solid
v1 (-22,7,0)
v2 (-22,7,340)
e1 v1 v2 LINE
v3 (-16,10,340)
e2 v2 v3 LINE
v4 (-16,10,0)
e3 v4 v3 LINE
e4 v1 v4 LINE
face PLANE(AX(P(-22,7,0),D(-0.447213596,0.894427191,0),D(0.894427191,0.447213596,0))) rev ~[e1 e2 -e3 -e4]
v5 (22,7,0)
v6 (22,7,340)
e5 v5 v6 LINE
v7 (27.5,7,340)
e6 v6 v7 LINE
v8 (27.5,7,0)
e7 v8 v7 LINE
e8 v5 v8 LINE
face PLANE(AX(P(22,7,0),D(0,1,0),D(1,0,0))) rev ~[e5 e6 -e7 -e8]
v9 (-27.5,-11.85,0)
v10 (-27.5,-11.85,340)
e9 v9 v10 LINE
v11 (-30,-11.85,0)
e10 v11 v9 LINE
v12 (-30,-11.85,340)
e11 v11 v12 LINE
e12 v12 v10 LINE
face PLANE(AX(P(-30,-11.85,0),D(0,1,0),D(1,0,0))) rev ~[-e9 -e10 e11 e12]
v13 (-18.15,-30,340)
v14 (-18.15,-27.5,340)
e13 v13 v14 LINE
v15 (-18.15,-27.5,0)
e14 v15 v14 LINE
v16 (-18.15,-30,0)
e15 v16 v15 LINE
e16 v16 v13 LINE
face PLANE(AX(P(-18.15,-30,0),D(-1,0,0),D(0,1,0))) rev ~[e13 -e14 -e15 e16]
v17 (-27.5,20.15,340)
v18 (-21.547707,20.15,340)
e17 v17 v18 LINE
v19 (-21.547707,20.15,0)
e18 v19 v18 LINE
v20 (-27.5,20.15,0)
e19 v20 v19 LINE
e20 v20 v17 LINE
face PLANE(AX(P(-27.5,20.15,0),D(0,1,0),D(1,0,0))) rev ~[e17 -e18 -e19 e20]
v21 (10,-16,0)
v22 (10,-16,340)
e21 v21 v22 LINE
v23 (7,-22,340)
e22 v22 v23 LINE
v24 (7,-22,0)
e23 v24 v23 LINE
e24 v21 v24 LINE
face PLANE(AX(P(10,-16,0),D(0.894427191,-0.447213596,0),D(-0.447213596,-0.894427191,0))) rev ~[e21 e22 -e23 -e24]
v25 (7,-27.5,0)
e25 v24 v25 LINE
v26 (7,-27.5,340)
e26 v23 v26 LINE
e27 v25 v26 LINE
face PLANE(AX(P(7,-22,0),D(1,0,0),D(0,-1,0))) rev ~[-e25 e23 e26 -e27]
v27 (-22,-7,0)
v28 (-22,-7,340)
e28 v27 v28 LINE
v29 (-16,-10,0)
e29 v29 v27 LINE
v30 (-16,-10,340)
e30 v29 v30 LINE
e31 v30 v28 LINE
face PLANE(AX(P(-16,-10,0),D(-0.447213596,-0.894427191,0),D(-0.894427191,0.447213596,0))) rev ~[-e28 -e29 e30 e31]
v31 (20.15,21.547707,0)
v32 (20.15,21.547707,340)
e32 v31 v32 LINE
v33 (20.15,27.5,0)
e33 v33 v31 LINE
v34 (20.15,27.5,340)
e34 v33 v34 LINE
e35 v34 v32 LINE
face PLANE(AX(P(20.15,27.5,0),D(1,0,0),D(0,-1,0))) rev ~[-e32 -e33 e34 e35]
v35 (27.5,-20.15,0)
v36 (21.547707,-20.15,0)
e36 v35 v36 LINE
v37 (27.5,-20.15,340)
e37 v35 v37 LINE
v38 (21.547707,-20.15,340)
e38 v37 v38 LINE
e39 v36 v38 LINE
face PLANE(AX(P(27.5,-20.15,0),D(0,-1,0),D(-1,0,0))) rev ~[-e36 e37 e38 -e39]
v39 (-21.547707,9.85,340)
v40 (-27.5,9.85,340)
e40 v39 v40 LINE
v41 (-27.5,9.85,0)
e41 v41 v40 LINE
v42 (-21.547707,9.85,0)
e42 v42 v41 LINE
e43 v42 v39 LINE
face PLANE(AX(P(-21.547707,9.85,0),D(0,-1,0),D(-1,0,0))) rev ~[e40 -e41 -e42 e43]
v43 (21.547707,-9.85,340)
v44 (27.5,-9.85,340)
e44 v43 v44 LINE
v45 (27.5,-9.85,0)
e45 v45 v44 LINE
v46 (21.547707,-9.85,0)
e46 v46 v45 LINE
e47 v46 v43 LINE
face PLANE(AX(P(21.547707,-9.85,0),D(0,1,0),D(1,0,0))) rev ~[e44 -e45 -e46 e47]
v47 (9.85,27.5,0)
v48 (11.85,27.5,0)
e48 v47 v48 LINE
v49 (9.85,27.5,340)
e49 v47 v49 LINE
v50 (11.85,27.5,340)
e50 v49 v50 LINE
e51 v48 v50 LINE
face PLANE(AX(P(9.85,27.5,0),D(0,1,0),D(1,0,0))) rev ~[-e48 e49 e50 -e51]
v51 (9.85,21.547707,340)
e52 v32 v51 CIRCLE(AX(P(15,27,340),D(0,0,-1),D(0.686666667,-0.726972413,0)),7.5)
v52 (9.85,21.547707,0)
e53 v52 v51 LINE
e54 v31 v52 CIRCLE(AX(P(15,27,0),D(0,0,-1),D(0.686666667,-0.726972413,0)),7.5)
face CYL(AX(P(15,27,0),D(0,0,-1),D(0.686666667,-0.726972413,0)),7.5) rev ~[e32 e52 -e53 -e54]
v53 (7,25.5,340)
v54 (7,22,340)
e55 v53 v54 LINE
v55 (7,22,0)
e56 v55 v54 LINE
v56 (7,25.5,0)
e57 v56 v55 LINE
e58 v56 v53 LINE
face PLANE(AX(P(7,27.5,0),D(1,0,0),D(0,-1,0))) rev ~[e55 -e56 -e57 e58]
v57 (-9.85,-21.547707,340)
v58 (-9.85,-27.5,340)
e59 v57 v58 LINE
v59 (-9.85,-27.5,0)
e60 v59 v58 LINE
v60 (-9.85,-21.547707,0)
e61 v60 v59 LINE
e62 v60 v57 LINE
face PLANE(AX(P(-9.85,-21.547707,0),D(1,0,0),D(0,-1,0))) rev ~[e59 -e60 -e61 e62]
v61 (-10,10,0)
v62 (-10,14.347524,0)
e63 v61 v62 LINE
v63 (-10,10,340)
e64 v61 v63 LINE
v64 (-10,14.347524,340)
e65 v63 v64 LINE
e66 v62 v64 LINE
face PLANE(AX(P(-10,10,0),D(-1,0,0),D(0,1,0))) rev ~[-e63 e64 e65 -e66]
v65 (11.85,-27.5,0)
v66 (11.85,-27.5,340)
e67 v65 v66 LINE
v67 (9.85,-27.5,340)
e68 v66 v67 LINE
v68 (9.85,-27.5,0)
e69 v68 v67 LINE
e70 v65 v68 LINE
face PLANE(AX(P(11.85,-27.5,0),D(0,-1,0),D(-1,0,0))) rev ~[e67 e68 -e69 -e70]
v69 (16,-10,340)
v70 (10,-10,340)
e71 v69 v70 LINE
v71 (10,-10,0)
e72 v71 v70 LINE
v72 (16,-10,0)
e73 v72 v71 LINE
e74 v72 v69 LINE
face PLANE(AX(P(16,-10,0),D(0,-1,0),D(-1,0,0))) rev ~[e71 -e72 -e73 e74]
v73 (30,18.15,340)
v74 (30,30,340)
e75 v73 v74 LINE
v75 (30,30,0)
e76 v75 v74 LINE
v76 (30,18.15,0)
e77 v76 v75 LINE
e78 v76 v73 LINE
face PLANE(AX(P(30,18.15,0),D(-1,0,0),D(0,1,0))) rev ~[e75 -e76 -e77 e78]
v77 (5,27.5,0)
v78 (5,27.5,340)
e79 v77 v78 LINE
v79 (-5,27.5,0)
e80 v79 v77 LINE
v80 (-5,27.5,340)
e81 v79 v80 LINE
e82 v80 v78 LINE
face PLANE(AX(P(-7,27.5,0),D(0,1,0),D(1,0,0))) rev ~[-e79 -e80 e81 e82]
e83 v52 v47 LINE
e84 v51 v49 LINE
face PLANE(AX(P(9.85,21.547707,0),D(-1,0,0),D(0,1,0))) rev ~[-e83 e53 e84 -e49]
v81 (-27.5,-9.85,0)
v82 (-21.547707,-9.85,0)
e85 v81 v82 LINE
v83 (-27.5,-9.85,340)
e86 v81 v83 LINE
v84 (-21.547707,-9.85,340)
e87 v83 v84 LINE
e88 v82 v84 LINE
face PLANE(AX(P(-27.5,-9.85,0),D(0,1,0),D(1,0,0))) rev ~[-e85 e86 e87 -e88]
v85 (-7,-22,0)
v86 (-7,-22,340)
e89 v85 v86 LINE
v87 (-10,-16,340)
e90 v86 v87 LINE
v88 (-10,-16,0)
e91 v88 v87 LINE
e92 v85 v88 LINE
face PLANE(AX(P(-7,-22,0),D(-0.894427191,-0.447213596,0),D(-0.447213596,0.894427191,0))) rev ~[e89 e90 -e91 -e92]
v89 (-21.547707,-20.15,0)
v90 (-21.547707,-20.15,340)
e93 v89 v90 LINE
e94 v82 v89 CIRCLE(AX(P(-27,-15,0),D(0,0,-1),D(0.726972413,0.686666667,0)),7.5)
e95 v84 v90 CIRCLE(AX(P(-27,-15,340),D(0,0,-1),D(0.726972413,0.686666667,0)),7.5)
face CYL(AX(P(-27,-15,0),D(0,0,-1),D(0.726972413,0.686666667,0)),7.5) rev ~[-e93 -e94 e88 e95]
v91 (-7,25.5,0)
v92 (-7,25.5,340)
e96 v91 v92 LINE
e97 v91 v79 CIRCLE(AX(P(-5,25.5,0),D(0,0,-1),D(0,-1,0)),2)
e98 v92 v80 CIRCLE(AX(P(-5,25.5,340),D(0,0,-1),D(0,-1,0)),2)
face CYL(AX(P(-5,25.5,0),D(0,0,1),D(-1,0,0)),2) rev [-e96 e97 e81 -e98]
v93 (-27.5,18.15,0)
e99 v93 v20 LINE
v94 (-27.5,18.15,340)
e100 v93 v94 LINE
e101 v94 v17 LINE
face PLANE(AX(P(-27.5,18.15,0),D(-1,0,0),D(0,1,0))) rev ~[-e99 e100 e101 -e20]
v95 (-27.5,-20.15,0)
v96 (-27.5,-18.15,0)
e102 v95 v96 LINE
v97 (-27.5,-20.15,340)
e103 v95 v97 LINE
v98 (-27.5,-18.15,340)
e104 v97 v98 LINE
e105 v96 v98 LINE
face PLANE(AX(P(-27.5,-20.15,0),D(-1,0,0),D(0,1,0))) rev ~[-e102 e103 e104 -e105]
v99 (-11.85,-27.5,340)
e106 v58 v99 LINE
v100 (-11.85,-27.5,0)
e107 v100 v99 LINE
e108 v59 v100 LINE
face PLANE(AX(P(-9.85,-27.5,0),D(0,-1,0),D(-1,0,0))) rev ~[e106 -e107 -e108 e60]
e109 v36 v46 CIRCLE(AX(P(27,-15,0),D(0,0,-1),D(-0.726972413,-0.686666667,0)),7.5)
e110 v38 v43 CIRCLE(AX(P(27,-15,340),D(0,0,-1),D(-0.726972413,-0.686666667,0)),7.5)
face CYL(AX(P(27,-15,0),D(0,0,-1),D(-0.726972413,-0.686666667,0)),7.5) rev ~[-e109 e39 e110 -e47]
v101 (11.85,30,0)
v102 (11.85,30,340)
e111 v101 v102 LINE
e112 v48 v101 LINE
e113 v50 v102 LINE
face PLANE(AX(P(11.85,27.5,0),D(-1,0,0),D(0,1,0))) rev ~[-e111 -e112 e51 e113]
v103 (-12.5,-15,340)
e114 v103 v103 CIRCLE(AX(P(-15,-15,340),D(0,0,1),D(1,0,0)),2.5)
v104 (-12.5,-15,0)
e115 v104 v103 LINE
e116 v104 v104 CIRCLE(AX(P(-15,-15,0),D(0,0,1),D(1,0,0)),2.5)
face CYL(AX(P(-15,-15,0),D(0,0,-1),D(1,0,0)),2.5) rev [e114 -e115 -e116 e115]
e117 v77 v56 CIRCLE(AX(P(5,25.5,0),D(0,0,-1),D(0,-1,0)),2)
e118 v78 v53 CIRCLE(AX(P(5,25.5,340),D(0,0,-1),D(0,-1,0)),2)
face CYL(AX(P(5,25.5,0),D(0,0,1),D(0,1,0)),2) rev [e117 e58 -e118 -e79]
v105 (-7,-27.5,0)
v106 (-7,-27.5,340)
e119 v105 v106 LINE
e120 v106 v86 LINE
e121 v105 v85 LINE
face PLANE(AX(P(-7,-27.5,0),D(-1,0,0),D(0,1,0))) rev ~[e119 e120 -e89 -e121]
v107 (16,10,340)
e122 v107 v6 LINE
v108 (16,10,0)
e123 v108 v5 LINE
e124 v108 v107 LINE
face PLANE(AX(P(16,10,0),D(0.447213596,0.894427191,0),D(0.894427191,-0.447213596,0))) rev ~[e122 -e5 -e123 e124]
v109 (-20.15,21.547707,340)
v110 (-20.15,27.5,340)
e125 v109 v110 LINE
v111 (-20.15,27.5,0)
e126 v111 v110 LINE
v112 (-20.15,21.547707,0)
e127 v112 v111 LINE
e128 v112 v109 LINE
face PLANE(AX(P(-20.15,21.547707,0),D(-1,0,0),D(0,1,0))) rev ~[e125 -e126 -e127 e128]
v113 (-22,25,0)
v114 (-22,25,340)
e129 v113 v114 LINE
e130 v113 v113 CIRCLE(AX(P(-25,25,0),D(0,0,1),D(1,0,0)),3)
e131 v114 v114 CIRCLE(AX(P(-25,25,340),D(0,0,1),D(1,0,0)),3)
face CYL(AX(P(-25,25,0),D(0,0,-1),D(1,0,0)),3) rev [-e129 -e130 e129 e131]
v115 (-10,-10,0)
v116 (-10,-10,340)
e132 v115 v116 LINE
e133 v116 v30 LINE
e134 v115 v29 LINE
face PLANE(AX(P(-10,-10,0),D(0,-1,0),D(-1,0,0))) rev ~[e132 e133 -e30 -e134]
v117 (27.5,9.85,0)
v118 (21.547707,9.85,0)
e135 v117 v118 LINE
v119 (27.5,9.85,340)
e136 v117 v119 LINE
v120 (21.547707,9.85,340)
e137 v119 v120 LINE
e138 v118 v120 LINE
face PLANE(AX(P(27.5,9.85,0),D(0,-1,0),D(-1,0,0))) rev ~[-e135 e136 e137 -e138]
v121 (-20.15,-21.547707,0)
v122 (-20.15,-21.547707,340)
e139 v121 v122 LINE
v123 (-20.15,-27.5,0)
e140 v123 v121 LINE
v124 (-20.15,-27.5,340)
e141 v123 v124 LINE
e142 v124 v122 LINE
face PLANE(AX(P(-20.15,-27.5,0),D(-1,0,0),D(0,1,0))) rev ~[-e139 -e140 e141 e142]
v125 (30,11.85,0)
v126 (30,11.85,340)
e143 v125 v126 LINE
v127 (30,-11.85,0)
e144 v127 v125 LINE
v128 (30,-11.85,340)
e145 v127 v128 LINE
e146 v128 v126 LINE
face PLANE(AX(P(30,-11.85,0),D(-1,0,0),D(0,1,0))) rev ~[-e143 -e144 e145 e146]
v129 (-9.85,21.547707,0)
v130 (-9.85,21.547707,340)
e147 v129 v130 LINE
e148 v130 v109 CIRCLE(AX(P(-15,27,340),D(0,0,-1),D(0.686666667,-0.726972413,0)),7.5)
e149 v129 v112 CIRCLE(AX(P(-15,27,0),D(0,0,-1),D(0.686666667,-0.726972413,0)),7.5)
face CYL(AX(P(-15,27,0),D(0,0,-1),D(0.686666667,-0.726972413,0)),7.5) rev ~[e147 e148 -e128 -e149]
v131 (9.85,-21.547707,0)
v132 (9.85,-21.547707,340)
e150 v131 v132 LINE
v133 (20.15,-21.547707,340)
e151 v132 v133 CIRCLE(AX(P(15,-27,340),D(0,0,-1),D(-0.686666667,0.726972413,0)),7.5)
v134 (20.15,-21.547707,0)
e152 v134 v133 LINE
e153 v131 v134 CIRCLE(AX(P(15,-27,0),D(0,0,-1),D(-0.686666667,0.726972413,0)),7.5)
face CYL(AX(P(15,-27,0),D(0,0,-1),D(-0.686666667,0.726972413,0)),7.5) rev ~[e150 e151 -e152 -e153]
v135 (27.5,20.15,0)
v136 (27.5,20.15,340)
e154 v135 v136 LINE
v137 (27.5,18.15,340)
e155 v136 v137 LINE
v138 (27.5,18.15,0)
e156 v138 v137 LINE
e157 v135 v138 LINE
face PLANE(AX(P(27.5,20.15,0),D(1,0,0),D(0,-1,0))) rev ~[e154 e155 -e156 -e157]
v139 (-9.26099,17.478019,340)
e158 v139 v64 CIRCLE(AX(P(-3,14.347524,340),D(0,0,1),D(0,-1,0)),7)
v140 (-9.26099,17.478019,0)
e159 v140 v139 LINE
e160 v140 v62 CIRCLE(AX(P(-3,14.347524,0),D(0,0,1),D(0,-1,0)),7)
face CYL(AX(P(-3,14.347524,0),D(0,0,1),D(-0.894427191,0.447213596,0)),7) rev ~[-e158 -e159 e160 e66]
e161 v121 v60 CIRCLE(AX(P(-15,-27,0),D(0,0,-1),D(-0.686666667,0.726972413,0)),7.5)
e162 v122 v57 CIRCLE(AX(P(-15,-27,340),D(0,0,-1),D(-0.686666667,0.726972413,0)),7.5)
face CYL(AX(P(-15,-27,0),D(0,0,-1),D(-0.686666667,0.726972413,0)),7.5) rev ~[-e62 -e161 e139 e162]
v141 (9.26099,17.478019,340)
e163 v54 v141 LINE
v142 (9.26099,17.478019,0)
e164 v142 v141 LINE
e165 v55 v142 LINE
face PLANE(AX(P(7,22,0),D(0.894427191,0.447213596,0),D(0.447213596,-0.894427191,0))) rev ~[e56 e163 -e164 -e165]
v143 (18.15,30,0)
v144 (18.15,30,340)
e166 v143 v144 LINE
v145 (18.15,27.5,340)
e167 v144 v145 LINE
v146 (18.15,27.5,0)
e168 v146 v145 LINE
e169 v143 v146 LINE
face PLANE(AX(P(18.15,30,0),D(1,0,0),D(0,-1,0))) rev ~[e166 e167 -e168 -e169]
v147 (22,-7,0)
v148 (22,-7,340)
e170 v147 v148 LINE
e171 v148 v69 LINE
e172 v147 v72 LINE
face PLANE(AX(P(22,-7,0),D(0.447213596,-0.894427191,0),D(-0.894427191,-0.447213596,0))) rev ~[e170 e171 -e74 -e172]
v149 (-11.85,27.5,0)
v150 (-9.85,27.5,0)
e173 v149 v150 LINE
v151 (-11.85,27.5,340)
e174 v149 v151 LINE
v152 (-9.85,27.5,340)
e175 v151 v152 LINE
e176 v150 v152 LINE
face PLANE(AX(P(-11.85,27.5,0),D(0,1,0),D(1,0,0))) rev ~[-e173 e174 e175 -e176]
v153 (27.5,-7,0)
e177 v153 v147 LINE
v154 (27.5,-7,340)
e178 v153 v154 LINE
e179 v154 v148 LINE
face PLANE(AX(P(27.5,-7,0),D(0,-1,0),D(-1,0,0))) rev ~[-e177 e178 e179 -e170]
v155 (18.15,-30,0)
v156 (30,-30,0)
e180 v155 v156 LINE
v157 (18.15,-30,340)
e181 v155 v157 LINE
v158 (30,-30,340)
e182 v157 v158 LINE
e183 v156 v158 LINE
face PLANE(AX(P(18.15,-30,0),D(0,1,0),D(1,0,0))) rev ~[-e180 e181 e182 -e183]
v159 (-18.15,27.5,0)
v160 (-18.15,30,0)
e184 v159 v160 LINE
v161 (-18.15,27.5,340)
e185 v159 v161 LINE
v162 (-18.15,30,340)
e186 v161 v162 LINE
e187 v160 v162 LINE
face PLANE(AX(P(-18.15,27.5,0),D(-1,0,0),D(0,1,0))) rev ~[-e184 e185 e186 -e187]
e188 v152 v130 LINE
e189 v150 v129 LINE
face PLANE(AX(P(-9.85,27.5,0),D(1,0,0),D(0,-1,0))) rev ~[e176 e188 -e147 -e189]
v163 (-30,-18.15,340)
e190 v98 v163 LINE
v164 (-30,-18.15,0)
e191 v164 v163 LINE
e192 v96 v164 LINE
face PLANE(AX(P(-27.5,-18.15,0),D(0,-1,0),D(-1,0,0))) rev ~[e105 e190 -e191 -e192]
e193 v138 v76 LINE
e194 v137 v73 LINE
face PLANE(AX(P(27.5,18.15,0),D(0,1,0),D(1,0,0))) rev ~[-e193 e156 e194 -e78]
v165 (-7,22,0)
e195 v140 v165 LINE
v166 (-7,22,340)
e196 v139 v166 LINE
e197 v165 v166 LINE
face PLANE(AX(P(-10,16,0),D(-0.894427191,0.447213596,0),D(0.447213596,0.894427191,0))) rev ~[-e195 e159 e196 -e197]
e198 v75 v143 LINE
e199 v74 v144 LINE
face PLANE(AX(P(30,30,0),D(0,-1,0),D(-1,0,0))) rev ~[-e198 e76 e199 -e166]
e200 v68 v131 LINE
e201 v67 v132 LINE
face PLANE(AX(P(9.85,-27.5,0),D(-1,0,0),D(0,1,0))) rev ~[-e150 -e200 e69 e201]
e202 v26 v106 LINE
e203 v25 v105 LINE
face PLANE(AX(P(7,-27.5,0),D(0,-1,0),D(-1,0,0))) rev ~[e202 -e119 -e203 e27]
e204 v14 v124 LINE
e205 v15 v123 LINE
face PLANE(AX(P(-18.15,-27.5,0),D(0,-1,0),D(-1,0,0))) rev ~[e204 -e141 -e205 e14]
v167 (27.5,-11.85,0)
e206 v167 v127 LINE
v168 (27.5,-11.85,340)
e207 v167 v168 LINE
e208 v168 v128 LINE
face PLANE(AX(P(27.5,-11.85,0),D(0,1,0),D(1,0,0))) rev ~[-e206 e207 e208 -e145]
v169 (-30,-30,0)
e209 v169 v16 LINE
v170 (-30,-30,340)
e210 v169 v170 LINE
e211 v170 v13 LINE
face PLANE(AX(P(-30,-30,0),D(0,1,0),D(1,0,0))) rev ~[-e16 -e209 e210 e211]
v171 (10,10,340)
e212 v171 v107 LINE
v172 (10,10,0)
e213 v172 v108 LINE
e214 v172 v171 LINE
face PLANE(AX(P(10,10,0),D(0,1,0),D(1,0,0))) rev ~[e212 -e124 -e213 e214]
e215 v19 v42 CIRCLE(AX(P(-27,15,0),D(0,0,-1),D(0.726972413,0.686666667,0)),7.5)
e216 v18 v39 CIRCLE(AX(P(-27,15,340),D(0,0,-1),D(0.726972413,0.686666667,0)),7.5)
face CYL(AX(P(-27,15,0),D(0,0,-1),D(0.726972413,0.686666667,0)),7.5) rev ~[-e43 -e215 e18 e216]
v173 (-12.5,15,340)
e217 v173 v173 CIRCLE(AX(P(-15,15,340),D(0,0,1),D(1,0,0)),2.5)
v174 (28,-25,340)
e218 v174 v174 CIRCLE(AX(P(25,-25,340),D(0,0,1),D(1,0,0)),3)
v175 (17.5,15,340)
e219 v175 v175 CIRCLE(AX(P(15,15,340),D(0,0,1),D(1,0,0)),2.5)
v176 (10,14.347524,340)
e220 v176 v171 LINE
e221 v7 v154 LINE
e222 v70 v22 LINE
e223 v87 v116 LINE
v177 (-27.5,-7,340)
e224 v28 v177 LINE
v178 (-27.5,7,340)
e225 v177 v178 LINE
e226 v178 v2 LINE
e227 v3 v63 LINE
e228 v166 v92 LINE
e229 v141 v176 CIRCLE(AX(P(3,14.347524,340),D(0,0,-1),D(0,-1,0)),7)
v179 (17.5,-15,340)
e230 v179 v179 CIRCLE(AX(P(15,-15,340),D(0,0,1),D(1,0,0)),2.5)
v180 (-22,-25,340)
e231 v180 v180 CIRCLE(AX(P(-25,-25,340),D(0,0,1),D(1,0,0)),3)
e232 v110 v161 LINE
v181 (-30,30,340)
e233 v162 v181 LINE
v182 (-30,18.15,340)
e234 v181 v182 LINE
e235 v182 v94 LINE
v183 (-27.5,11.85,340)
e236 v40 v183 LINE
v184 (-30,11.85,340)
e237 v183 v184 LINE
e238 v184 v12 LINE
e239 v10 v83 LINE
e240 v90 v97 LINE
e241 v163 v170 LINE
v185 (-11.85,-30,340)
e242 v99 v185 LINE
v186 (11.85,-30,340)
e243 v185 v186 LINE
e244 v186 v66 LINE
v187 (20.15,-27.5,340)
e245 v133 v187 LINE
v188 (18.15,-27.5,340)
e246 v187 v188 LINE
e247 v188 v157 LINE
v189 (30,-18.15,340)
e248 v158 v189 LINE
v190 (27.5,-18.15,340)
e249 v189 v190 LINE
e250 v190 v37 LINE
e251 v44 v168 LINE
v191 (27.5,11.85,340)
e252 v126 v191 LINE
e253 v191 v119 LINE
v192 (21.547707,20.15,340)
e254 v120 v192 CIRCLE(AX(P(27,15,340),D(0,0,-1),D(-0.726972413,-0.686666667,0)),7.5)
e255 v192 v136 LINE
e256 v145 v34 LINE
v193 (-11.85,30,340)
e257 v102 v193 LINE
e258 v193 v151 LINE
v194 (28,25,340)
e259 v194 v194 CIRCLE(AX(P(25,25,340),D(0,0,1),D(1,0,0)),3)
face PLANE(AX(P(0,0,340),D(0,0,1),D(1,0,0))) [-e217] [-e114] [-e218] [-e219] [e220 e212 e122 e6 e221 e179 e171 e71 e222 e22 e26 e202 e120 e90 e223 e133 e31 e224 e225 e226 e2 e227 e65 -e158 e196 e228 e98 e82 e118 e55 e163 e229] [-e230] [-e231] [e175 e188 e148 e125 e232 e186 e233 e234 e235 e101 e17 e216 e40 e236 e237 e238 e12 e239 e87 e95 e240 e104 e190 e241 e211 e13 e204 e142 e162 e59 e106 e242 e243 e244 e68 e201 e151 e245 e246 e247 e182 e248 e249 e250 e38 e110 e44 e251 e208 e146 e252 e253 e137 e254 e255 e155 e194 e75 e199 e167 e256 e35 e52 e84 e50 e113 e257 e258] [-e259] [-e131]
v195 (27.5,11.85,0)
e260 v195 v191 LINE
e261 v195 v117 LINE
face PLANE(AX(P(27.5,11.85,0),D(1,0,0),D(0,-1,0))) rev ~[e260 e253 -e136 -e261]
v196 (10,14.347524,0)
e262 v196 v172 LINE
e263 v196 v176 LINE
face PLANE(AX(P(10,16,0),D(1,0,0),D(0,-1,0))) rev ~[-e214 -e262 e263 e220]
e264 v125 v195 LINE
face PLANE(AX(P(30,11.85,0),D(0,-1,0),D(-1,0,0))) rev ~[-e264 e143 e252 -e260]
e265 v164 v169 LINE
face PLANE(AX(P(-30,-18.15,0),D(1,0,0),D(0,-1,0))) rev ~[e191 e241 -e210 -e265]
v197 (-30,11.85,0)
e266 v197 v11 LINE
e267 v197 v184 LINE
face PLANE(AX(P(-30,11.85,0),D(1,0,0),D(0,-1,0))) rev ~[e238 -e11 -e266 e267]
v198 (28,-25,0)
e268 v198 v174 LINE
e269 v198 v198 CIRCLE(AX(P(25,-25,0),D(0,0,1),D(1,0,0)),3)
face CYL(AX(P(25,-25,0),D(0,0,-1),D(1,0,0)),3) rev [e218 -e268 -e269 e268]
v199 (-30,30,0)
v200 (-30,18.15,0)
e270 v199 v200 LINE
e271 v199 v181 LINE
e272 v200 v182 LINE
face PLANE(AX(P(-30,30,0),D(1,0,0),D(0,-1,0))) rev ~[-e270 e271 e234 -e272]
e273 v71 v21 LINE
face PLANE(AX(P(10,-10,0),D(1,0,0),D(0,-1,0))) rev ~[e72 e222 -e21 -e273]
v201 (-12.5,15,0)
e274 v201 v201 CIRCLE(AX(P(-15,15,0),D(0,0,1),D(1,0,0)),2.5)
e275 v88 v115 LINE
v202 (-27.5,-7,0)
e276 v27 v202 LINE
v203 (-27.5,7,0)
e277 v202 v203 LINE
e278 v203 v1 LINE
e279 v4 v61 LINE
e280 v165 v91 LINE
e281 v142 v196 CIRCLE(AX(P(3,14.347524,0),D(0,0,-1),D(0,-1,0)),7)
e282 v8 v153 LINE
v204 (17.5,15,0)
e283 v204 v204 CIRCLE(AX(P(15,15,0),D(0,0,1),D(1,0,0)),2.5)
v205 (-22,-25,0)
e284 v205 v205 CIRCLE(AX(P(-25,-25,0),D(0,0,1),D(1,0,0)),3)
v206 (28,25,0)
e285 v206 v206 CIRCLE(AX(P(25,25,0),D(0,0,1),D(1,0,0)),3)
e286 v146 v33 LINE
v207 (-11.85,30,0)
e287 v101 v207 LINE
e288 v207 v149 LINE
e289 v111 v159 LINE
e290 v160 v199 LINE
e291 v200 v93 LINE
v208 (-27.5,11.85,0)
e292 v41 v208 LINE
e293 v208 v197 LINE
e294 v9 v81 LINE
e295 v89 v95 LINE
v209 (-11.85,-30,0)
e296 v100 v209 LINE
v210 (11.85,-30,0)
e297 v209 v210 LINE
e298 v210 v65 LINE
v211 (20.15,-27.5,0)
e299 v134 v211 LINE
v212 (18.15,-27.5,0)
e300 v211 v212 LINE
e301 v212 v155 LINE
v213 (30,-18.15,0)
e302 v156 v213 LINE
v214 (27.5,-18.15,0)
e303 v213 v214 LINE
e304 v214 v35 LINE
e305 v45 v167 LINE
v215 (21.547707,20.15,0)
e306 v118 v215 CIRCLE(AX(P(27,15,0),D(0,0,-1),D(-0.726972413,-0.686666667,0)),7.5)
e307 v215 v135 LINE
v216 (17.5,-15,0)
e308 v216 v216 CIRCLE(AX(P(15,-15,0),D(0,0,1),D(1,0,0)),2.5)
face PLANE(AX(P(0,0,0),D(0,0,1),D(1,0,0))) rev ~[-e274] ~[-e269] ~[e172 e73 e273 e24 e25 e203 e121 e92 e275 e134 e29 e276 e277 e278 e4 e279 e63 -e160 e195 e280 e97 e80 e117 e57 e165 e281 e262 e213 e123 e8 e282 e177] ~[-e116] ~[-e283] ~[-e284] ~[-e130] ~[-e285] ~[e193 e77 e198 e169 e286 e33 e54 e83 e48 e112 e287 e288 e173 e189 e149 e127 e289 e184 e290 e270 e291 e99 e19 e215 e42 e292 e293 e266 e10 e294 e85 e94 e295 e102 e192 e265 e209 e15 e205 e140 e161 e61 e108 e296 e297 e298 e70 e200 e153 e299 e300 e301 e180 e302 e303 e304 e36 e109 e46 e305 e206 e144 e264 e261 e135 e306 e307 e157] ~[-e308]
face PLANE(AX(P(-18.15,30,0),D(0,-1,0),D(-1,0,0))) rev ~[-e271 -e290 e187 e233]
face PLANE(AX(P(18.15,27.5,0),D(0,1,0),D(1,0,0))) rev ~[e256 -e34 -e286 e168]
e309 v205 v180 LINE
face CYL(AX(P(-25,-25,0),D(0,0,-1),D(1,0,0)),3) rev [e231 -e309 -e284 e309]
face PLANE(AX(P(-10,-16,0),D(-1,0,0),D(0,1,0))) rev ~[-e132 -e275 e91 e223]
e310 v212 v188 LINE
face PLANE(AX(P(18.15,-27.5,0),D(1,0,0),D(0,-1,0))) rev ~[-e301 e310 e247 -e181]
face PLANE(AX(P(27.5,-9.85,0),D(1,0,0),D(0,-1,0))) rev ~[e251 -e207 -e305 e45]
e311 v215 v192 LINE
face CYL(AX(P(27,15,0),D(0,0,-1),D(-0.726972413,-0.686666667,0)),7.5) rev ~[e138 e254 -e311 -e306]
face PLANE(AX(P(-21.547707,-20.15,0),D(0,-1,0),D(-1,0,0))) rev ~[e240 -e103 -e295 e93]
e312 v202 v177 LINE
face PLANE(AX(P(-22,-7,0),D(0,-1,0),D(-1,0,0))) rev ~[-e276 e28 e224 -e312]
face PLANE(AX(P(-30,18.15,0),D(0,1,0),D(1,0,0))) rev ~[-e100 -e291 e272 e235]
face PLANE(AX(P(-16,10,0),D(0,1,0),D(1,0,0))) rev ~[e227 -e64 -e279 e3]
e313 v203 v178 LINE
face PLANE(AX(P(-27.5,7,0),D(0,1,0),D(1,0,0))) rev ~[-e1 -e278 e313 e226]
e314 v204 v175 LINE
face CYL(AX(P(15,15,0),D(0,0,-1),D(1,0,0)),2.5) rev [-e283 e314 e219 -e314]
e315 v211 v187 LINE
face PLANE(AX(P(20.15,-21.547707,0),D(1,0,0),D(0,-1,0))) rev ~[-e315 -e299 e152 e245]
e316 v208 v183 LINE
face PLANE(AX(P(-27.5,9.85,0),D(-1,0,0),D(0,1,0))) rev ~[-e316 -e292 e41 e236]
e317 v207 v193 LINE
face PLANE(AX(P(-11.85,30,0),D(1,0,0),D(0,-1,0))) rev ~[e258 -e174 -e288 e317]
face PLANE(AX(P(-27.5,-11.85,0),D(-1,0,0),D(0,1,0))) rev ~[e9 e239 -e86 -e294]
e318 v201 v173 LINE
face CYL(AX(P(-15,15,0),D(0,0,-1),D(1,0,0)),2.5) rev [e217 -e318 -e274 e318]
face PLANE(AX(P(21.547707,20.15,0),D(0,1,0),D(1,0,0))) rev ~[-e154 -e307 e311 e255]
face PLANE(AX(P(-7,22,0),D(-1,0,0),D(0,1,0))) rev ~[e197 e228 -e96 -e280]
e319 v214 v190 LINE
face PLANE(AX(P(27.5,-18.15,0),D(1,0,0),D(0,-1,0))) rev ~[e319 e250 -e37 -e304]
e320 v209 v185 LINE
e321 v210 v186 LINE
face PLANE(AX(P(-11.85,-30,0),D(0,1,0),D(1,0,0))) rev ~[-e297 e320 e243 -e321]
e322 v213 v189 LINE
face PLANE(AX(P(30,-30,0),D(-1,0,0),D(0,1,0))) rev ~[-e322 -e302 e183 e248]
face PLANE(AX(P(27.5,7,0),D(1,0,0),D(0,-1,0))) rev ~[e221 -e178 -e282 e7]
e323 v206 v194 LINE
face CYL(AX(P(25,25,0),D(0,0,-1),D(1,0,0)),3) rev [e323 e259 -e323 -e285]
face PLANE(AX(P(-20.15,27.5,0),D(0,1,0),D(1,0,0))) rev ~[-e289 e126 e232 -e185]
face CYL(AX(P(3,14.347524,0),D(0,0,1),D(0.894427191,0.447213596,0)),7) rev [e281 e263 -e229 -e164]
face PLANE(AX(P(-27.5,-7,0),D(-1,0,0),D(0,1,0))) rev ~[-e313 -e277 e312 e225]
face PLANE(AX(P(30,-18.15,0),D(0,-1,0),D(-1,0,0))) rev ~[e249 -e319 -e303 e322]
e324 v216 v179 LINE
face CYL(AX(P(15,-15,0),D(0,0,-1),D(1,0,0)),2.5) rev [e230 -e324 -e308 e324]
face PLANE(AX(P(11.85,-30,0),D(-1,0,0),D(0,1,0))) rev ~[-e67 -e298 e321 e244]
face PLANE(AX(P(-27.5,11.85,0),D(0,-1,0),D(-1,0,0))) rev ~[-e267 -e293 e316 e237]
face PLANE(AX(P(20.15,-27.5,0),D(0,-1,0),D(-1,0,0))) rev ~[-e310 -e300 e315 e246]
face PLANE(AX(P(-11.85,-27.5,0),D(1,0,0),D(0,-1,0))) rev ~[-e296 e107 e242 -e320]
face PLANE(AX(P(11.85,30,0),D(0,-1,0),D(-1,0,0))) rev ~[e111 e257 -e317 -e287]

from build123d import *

# Parameters (mm, degrees)
F0_R     = 3
F0_R_2   = 2.5
F1_DEPTH = 340
F2_R     = 2
F3_R     = 7


# Not quite as in the source:
# - a feature names something its author has since deleted; it is built from what else it names


with BuildPart() as f1:
    # F0 (on Top) → F1 (new body)
    with BuildSketch(Plane.XY):
        with BuildLine():
            Line((18.15, -30), (30, -30))
            Line((30, -30), (30, -18.15))
            Line((30, -18.15), (27.5, -18.15))
            Line((27.5, -18.15), (27.5, -20.15))
            Line((27.5, -20.15), (21.5477069044, -20.15))
            ThreePointArc((21.5477069044, -20.15), (19.5, -15), (21.5477069044, -9.85))
            Line((21.5477069044, -9.85), (27.5, -9.85))
            Line((27.5, -9.85), (27.5, -11.85))
            Line((27.5, -11.85), (30, -11.85))
            Line((30, -11.85), (30, 11.85))
            Line((30, 11.85), (27.5, 11.85))
            Line((27.5, 11.85), (27.5, 9.85))
            Line((27.5, 9.85), (21.5477069044, 9.85))
            ThreePointArc((21.5477069044, 9.85), (19.5, 15), (21.5477069044, 20.15))
            Line((21.5477069044, 20.15), (27.5, 20.15))
            Line((27.5, 20.15), (27.5, 18.15))
            Line((27.5, 18.15), (30, 18.15))
            Line((30, 18.15), (30, 30))
            Line((30, 30), (18.15, 30))
            Line((18.15, 30), (18.15, 27.5))
            Line((18.15, 27.5), (20.15, 27.5))
            Line((20.15, 27.5), (20.15, 21.5477069044))
            ThreePointArc((20.15, 21.5477069044), (15, 19.5), (9.85, 21.5477069044))
            Line((9.85, 21.5477069044), (9.85, 27.5))
            Line((9.85, 27.5), (11.85, 27.5))
            Line((11.85, 27.5), (11.85, 30))
            Line((11.85, 30), (-11.85, 30))
            Line((-11.85, 30), (-11.85, 27.5))
            Line((-11.85, 27.5), (-9.85, 27.5))
            Line((-9.85, 27.5), (-9.85, 21.5477069044))
            ThreePointArc((-9.85, 21.5477069044), (-15, 19.5), (-20.15, 21.5477069044))
            Line((-20.15, 21.5477069044), (-20.15, 27.5))
            Line((-20.15, 27.5), (-18.15, 27.5))
            Line((-18.15, 27.5), (-18.15, 30))
            Line((-18.15, 30), (-30, 30))
            Line((-30, 30), (-30, 18.15))
            Line((-30, 18.15), (-27.5, 18.15))
            Line((-27.5, 18.15), (-27.5, 20.15))
            Line((-27.5, 20.15), (-21.5477069044, 20.15))
            ThreePointArc((-21.5477069044, 20.15), (-19.5, 15), (-21.5477069044, 9.85))
            Line((-21.5477069044, 9.85), (-27.5, 9.85))
            Line((-27.5, 9.85), (-27.5, 11.85))
            Line((-27.5, 11.85), (-30, 11.85))
            Line((-30, 11.85), (-30, -11.85))
            Line((-30, -11.85), (-27.5, -11.85))
            Line((-27.5, -11.85), (-27.5, -9.85))
            Line((-27.5, -9.85), (-21.5477069044, -9.85))
            ThreePointArc((-21.5477069044, -9.85), (-19.5, -15), (-21.5477069044, -20.15))
            Line((-21.5477069044, -20.15), (-27.5, -20.15))
            Line((-27.5, -20.15), (-27.5, -18.15))
            Line((-27.5, -18.15), (-30, -18.15))
            Line((-30, -18.15), (-30, -30))
            Line((-30, -30), (-18.15, -30))
            Line((-18.15, -30), (-18.15, -27.5))
            Line((-18.15, -27.5), (-20.15, -27.5))
            Line((-20.15, -27.5), (-20.15, -21.5477069044))
            ThreePointArc((-20.15, -21.5477069044), (-15, -19.5), (-9.85, -21.5477069044))
            Line((-9.85, -21.5477069044), (-9.85, -27.5))
            Line((-9.85, -27.5), (-11.85, -27.5))
            Line((-11.85, -27.5), (-11.85, -30))
            Line((-11.85, -30), (11.85, -30))
            Line((11.85, -30), (11.85, -27.5))
            Line((11.85, -27.5), (9.85, -27.5))
            Line((9.85, -27.5), (9.85, -21.5477069044))
            ThreePointArc((9.85, -21.5477069044), (15, -19.5), (20.15, -21.5477069044))
            Line((20.15, -21.5477069044), (20.15, -27.5))
            Line((20.15, -27.5), (18.15, -27.5))
            Line((18.15, -27.5), (18.15, -30))
        make_face()
        with Locations((-25, -25)):
            Circle(F0_R, mode=Mode.SUBTRACT)
        with Locations((-15, -15)):
            Circle(F0_R_2, mode=Mode.SUBTRACT)
        with Locations((25, -25)):
            Circle(F0_R, mode=Mode.SUBTRACT)
        with Locations((15, -15)):
            Circle(F0_R_2, mode=Mode.SUBTRACT)
        with Locations((-25, 25)):
            Circle(F0_R, mode=Mode.SUBTRACT)
        with Locations((-15, 15)):
            Circle(F0_R_2, mode=Mode.SUBTRACT)
        Polygon((-7, 22), (-7, 27.5), (0, 27.5), (7, 27.5), (7, 22), (10, 16), (10, 10), (16, 10), (22, 7), (27.5, 7), (27.5, 0), (27.5, -7), (22, -7), (16, -10), (10, -10), (10, -16), (7, -22), (7, -27.5), (0, -27.5), (-7, -27.5), (-7, -22), (-10, -16), (-10, -10), (-16, -10), (-22, -7), (-27.5, -7), (-27.5, 0), (-27.5, 7), (-22, 7), (-16, 10), (-10, 10), (-10, 16), align=None, mode=Mode.SUBTRACT)
        with Locations((15, 15)):
            Circle(F0_R_2, mode=Mode.SUBTRACT)
        with Locations((25, 25)):
            Circle(F0_R, mode=Mode.SUBTRACT)
    extrude(amount=F1_DEPTH)

    # F2
    f2_edges = [f1.edges().sort_by_distance(p)[0] for p in [
        (-7, 27.5, 170),
        (7, 27.5, 170),
    ]]
    fillet(f2_edges, radius=F2_R)

    # F3
    f3_edges = [f1.edges().sort_by_distance(p)[0] for p in [
        (-10, 16, 170),
        (10, 16, 170),
    ]]
    fillet(f3_edges, radius=F3_R)


solid = f1.part
